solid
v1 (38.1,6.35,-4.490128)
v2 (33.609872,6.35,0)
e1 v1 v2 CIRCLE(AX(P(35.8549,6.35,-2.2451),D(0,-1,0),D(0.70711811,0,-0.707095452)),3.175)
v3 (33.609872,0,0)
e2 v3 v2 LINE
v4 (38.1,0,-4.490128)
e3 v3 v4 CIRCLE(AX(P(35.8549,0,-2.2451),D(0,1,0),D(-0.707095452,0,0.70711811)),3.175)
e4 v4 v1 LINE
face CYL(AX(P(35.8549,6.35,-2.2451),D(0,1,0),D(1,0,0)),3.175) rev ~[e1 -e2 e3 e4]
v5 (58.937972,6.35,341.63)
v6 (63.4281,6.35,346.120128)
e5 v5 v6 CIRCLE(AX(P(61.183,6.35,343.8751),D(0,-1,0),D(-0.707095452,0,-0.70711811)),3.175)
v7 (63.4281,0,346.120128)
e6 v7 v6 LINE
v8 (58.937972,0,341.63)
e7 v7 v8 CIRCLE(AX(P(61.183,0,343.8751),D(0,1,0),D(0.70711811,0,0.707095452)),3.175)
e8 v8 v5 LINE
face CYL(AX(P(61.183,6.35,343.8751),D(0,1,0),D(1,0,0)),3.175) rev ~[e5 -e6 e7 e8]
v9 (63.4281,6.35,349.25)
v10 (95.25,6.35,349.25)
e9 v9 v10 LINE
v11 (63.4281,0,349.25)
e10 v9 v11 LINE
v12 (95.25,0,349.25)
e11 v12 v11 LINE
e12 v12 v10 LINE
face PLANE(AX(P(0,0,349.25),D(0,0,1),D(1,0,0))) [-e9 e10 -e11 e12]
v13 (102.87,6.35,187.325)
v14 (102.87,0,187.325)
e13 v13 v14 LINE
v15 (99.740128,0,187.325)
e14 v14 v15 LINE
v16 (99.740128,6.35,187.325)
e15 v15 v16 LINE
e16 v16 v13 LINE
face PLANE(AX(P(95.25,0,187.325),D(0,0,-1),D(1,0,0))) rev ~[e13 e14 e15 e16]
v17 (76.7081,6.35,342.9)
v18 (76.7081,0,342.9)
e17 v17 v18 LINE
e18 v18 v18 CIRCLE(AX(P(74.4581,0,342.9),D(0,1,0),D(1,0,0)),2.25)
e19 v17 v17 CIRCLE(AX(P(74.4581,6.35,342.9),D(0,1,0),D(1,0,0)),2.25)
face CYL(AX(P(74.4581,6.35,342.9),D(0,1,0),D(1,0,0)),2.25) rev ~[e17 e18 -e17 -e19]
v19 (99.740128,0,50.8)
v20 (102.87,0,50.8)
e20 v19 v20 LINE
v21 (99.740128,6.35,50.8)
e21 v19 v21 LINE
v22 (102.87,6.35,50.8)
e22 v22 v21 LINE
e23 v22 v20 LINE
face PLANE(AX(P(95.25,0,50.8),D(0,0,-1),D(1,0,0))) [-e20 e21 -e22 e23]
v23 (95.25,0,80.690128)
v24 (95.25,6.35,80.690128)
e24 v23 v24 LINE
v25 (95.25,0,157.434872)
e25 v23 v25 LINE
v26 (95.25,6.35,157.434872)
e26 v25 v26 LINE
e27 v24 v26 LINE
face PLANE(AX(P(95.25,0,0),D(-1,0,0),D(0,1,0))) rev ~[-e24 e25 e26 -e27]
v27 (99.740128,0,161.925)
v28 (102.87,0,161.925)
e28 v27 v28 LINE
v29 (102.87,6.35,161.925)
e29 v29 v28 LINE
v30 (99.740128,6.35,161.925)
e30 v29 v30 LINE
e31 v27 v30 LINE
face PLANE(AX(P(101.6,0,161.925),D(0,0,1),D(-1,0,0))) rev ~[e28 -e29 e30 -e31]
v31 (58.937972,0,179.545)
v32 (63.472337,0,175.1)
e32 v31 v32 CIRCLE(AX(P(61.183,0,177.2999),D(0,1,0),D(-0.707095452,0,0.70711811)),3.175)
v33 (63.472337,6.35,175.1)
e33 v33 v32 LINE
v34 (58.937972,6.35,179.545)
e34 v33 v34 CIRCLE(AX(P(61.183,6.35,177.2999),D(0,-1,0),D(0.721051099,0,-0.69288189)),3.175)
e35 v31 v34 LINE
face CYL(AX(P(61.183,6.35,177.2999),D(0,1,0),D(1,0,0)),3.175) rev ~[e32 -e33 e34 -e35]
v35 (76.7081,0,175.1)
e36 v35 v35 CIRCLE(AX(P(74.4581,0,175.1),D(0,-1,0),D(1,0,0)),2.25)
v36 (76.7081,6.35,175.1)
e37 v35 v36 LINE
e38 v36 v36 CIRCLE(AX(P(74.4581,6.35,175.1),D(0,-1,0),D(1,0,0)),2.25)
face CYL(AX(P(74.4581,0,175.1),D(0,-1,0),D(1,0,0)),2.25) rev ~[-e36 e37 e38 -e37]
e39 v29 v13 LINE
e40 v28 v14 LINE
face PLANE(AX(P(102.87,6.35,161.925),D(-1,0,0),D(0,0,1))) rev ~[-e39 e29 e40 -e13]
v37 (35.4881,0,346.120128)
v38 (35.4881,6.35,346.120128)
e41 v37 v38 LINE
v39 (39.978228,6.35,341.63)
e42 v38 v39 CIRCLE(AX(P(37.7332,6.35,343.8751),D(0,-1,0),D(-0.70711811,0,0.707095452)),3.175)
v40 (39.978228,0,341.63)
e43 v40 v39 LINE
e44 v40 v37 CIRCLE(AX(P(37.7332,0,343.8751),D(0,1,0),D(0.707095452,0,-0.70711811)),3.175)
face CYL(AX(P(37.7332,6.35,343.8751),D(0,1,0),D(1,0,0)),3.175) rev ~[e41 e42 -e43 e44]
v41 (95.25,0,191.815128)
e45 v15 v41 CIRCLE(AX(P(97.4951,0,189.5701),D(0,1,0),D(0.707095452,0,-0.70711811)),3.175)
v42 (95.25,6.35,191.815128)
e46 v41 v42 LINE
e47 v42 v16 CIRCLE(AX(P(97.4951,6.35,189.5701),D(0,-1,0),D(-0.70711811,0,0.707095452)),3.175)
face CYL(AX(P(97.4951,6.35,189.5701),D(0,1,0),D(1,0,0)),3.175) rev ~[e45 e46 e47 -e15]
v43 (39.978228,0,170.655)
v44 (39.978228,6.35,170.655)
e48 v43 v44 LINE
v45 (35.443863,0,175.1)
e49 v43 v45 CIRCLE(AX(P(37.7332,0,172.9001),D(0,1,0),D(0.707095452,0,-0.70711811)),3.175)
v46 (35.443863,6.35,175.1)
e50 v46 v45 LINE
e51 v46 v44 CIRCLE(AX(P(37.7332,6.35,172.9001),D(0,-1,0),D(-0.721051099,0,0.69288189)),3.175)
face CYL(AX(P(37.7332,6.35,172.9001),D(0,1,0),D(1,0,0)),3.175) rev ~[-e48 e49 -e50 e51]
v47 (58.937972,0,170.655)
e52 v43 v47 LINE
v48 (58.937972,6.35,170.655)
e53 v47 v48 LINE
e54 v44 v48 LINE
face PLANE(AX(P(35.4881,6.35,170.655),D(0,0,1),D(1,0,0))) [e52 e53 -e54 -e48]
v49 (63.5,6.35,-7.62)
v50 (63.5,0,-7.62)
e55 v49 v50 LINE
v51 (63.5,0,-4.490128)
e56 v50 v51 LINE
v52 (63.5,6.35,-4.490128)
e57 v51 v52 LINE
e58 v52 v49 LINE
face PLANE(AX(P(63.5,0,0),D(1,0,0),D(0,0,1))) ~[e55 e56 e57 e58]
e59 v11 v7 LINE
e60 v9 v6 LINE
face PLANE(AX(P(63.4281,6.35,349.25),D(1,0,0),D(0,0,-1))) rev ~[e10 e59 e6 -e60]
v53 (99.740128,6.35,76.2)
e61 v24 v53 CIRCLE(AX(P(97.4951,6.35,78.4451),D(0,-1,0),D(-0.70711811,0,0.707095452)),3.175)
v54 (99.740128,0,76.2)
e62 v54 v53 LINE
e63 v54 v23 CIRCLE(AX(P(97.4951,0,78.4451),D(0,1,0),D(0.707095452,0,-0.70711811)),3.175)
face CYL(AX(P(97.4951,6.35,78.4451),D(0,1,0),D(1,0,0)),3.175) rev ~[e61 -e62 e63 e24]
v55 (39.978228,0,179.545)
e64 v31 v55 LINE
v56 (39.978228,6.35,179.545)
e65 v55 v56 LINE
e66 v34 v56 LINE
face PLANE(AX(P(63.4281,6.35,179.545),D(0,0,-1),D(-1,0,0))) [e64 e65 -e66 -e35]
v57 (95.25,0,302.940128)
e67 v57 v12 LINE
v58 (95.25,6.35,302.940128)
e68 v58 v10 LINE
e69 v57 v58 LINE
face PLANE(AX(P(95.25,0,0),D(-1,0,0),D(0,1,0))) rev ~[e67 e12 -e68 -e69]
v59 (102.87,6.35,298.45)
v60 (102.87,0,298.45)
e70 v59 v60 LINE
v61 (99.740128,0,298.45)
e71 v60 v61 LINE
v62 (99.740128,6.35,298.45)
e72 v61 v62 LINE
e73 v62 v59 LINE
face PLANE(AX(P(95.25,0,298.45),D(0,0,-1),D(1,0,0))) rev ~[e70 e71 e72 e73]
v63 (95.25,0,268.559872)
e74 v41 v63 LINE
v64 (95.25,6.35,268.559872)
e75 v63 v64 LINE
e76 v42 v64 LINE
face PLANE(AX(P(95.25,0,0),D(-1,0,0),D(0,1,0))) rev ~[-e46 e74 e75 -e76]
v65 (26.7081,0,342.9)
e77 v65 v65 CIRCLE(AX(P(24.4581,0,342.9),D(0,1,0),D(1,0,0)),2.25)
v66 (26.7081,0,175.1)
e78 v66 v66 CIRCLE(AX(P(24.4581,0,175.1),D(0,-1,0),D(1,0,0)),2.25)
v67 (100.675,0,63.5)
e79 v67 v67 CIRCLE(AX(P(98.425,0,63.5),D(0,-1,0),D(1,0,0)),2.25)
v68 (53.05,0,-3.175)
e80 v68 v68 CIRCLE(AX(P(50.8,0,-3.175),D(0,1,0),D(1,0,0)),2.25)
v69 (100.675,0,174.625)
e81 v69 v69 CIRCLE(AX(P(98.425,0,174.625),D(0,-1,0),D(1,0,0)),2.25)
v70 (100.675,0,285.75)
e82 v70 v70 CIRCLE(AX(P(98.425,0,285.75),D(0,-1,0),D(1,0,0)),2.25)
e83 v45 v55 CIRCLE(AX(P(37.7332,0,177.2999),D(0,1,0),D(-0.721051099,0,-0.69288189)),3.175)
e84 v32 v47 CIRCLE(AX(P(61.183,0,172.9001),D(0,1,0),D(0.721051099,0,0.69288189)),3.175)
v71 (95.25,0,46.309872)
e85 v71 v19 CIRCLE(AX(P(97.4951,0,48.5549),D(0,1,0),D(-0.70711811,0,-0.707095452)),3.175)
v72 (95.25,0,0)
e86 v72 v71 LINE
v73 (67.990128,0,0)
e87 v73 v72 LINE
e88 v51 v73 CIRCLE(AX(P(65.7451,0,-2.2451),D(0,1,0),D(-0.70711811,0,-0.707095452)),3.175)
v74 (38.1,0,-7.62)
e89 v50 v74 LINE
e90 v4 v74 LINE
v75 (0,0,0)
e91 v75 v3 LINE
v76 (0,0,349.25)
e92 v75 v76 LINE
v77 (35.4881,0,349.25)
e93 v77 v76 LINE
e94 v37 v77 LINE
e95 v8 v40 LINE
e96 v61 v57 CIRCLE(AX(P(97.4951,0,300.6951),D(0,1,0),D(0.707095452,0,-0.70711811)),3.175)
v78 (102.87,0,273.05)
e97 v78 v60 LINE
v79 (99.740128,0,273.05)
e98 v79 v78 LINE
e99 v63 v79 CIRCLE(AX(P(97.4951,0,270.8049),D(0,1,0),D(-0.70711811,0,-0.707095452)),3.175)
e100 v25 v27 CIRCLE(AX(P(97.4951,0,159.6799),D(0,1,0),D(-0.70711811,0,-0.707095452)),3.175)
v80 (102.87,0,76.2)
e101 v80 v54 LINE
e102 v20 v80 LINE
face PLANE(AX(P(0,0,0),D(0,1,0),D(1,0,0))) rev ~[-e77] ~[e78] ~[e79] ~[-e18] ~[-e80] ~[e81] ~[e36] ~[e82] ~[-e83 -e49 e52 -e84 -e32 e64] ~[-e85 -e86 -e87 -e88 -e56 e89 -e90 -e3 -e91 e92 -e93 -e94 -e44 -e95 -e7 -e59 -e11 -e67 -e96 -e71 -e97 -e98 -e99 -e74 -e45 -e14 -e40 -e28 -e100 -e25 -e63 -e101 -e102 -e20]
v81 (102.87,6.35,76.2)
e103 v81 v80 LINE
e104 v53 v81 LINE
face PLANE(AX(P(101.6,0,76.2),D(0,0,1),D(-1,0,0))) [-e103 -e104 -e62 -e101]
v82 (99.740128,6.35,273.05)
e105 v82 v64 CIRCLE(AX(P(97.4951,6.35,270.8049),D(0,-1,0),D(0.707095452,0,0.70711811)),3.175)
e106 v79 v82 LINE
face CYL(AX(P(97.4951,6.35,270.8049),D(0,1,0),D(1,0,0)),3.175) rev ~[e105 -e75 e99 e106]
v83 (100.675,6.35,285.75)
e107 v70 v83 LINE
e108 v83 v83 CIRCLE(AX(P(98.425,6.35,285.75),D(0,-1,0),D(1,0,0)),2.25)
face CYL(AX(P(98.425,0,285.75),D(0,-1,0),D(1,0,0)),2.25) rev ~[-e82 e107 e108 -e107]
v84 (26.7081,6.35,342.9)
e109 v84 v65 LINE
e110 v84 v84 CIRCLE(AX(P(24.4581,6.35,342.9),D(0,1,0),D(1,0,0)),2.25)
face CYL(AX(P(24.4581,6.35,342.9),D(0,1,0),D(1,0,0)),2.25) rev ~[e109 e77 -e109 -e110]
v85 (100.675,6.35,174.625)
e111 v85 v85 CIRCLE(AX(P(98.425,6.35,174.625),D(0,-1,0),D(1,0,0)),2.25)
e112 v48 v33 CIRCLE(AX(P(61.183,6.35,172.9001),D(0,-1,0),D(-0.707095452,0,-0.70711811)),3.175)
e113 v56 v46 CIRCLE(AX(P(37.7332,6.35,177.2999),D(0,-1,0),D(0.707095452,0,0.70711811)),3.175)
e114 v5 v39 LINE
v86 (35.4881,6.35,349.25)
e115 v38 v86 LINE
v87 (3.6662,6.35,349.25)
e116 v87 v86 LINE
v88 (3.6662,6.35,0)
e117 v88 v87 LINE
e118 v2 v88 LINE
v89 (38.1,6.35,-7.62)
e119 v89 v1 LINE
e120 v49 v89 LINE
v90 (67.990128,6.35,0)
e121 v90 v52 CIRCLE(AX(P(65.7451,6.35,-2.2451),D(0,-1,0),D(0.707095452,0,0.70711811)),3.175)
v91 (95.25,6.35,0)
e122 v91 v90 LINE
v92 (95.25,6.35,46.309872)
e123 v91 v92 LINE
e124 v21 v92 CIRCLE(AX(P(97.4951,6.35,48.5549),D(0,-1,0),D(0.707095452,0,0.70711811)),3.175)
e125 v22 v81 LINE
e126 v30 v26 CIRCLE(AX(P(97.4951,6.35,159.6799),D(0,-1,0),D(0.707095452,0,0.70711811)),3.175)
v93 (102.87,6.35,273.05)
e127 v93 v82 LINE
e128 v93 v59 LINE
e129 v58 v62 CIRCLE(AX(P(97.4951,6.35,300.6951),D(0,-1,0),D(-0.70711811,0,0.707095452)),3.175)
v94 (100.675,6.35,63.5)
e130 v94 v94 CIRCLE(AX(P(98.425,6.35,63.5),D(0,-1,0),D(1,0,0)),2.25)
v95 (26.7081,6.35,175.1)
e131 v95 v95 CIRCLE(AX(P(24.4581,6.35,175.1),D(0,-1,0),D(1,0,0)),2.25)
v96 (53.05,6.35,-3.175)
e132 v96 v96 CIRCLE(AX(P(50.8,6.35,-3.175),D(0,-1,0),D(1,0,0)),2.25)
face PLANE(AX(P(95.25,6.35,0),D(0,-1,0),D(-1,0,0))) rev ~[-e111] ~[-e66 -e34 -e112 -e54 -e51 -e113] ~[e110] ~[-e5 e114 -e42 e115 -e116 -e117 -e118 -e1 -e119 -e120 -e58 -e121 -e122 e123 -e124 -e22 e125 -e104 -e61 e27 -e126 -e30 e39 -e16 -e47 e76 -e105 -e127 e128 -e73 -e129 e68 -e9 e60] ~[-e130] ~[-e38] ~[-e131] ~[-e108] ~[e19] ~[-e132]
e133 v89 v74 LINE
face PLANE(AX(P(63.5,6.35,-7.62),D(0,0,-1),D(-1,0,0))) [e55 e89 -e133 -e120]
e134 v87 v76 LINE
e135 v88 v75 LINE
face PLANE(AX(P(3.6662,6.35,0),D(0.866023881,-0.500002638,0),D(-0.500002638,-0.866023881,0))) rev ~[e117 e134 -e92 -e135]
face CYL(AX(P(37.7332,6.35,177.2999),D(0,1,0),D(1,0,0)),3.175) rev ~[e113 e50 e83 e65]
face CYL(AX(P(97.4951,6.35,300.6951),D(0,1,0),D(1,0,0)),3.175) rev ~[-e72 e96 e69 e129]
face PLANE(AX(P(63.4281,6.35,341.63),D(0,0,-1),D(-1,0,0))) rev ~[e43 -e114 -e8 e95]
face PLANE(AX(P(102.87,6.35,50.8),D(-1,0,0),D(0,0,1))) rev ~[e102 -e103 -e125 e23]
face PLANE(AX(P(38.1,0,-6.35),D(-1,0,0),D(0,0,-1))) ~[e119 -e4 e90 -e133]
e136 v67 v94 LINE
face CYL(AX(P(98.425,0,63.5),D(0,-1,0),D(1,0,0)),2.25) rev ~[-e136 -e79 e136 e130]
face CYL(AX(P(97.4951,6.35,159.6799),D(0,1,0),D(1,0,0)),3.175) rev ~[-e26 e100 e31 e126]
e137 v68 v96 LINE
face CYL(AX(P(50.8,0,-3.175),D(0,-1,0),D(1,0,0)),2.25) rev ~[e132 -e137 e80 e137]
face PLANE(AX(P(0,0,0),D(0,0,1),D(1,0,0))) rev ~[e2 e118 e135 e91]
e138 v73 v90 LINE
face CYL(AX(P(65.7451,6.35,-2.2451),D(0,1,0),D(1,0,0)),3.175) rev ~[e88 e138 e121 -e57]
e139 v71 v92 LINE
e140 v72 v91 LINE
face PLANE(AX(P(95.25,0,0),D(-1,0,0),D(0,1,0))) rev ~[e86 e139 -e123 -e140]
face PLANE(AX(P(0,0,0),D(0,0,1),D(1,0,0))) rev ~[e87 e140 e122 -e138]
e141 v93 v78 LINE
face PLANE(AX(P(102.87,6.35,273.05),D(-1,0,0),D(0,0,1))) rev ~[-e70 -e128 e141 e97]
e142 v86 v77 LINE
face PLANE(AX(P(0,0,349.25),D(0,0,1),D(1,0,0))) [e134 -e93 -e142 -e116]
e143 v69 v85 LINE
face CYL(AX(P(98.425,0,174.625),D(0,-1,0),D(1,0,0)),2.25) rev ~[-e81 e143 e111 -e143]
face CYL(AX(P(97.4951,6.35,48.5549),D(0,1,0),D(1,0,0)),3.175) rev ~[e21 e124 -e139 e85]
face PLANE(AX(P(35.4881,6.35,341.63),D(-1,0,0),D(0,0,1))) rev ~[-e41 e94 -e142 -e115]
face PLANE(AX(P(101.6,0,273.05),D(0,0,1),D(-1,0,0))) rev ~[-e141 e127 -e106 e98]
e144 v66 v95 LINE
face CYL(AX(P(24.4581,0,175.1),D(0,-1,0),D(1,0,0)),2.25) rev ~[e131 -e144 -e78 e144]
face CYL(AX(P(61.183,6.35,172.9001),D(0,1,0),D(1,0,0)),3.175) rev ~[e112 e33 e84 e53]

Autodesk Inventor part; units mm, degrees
ref_plane "YZ Plane" through (0, 0, 0) normal (1, 0, 0) x (0, 1, 0)
ref_plane "XZ Plane" through (0, 0, 0) normal (0, 1, 0) x (-1, 0, 0)
sketch "Sketch1" plane through (0, 0, 0) normal (0, 0, 1) x (1, 0, 0)
  line L0 (0, 0) -> (95.25, 0)
  line L1 (95.25, 0) -> (95.25, 6.35)
  line L2 (95.25, 6.35) -> (3.6662, 6.35)
  line L3 (3.6662, 6.35) -> (0, 0)
  dimension "d0" = 95.25
  dimension "d1" = 6.35
  dimension "d2" = 60
extrude "Extrusion1" add sketch "Sketch1" along normal blind 349.25
sketch "Sketch2" plane through (0, 0, 0) normal (0, -1, 0) x (1, 0, 0)
  line L0 (38.1, 349.25) -> (63.5, 349.25)
  line L1 (63.5, 349.25) -> (63.5, 355.6)
  line L2 (63.5, 355.6) -> (38.1, 355.6)
  line L3 (38.1, 355.6) -> (38.1, 349.25)
  line L4 (0, 349.25) -> (101.6, 349.25)
  line L5 (0, 349.25) -> (95.25, 349.25) projected
  point P0 (0, 0)
  point P1 (50.8, 349.25)
  dimension "d5" = 25.4
  dimension "d6" = 6.35
  dimension "d9" = 101.6
extrude "Extrusion2" add sketch "Sketch2" against normal blind 6.35
sketch "Sketch3" plane through (0, 0, 0) normal (0, -1, 0) x (1, 0, 0)
  line L0 (63.5, 349.25) -> (63.5, 355.6) projected
  line L1 (63.5, 355.6) -> (38.1, 355.6) projected
  circle A0 centre (50.8, 352.425) radius 2.25
  point P0 (0, 0)
  point P1 (50.8, 355.6)
  point P2 (63.5, 352.425)
  dimension "d10" = 4.5
extrude "Extrusion3" cut sketch "Sketch3" against normal through all
sketch "Sketch4" plane through (0, 0, 0) normal (0, -1, 0) x (1, 0, 0)
  line L0 (95.25, 0) -> (95.25, 349.25) projected
  line L1 (95.25, 50.8) -> (101.6, 50.8)
  line L2 (101.6, 50.8) -> (101.6, 76.2)
  line L3 (101.6, 76.2) -> (95.25, 76.2)
  line L4 (95.25, 76.2) -> (95.25, 50.8)
  line L5 (95.25, 298.45) -> (101.6, 298.45)
  line L6 (101.6, 298.45) -> (101.6, 273.05)
  line L7 (101.6, 273.05) -> (95.25, 273.05)
  line L8 (95.25, 273.05) -> (95.25, 298.45)
  line L9 (95.25, 187.325) -> (101.6, 187.325)
  line L10 (101.6, 187.325) -> (101.6, 161.925)
  line L11 (101.6, 161.925) -> (95.25, 161.925)
  line L12 (95.25, 161.925) -> (95.25, 187.325)
  circle A0 centre (98.425, 285.75) radius 2.25
  circle A1 centre (98.425, 174.625) radius 2.25
  circle A2 centre (98.425, 63.5) radius 2.25
  point P0 (0, 0)
  point P1 (95.25, 174.625)
  point P2 (98.425, 298.45)
  point P3 (98.425, 187.325)
  point P4 (98.425, 76.2)
  point P5 (101.6, 285.75)
  point P6 (101.6, 174.625)
  point P7 (101.6, 63.5)
  dimension "d13" = 6.35
  dimension "d14" = 25.4
  dimension "d15" = 6.35
  dimension "d16" = 25.4
  dimension "d17" = 6.35
  dimension "d18" = 25.4
  dimension "d19" = 50.8
  dimension "d20" = 50.8
  dimension "d21" = 4.5
  dimension "d22" = 4.5
  dimension "d23" = 4.5
extrude "Extrusion4" add sketch "Sketch4" against normal blind 6.35
sketch "Sketch9" plane through (95.25, 0, 298.45) normal (0, 0, 1) x (1, 0, 0)
  line L0 (-95.25, 0) -> (0, 0) projected
  line L1 (-95.25, 0) -> (-95.25, 6.35)
  line L2 (0, 6.35) -> (-91.5838, 6.35) projected
  line L3 (-95.25, 6.35) -> (-91.5838, 6.35)
  line L4 (-91.5838, 6.35) -> (-95.25, 0)
  line L5 (-91.5838, 6.35) -> (-95.25, 0) projected
extrude "Extrusion9" [suppressed]
sketch "Sketch10" plane through (95.25, 0, 187.325) normal (0, 0, 1) x (1, 0, 0)
  line L0 (-81.5677, 12.7) -> (-88.9, 0) projected
  line L1 (-81.5677, 12.7) -> (-88.9, 12.7) projected
  line L2 (-88.9, 12.7) -> (-88.9, 0) projected
  point P0 (-95.25, 0)
extrude "Extrusion10" [suppressed]
sketch "Sketch11" plane through (95.25, 0, 76.2) normal (0, 0, 1) x (1, 0, 0)
  line L0 (-81.5677, 12.7) -> (-88.9, 0) projected
  line L1 (-81.5677, 12.7) -> (-88.9, 12.7) projected
  line L2 (-88.9, 12.7) -> (-88.9, 0) projected
  point P0 (-95.25, 0)
extrude "Extrusion11" [suppressed]
ref_plane "Work Plane1" through (0, 0, 174.625) normal (0, 0, 1) x (1, 0, 0)
mirror "Mirror1" about plane through (0, 0, 174.625) normal (0, 0, 1) of "Extrusion1", "Extrusion2", "Extrusion3", "Extrusion4"
sketch "Sketch12" plane through (3.6662, 6.35, 349.25) normal (0, 1, 0) x (1, 0, 0)
  line L0 (59.8338, 0) -> (59.8338, -6.35) projected
  line L1 (59.8338, -6.35) -> (59.8338, 0) projected
  line L2 (59.8338, -6.35) -> (34.4338, -6.35) projected
  line L3 (34.4338, -6.35) -> (59.8338, -6.35) projected
  line L4 (34.4338, 0) -> (34.4338, -6.35) projected
  line L5 (59.8338, 0) -> (34.4338, 0)
  line L6 (91.5838, 0) -> (59.8338, 0) projected
  line L7 (34.4338, -6.35) -> (59.8338, -6.35)
  line L8 (59.8338, -6.35) -> (59.8338, 0)
  line L9 (59.8338, 0) -> (34.4338, 0)
  line L10 (34.4338, 0) -> (34.4338, -6.35)
  point P0 (-3.6662, 349.25)
extrude "Extrusion12" cut sketch "Sketch12" along normal through all both and the other way through all
sketch "Sketch13" plane through (3.6662, 6.35, 349.25) normal (0, 1, 0) x (1, 0, 0)
  circle A0 centre (20.7919, 6.35) radius 2.25
  line L0 (91.5838, 0) -> (0, 0) projected
  circle A1 centre (70.7919, 6.35) radius 2.25
  line L1 (33.0919, 0) -> (58.4919, 0)
  line L2 (58.4919, 0) -> (58.4919, 6.35)
  line L3 (58.4919, 6.35) -> (33.0919, 6.35)
  line L4 (33.0919, 6.35) -> (33.0919, 0)
  line L5 (20.7919, 6.35) -> (70.7919, 6.35) construction
  point P0 (-3.6662, 349.25)
  point P1 (45.7919, 6.35)
  point P2 (45.7919, 0)
  point P3 (45.7919, 0)
  dimension "d44" = 4.5
  dimension "d45" = 6.35
  dimension "d46" = 4.5
  dimension "d47" = 25.4
  dimension "d48" = 6.35
  dimension "d49" = 50
extrude "Extrusion13" cut sketch "Sketch13" against normal through all
sketch "Sketch14" plane through (95.25, 0, 50.8) normal (0, -1, 0) x (1, 0, 0)
  line L0 (6.35, 111.125) -> (6.35, 136.525) projected
  line L1 (-33.0919, 292.1) -> (-58.4919, 292.1) projected
  line L2 (-58.4919, 127.475) -> (-33.0919, 127.475)
  line L3 (-33.0919, 127.475) -> (-33.0919, 121.125)
  line L4 (-33.0919, 121.125) -> (-58.4919, 121.125)
  line L5 (-58.4919, 121.125) -> (-58.4919, 127.475)
  point P0 (-95.25, -50.8)
  dimension "d54" = 6.35
  dimension "d55" = 10
extrude "Extrusion14" cut sketch "Sketch14" against normal through all
sketch "Sketch15" plane through (95.25, 0, 50.8) normal (0, -1, 0) x (1, 0, 0)
  circle A0 centre (-70.7919, 124.3) radius 2.25
  circle A1 centre (-20.7919, 124.3) radius 2.25
  circle A2 centre (-70.7919, 292.1) radius 2.25 projected
  circle A3 centre (-20.7919, 292.1) radius 2.25 projected
  line L0 (-33.0919, 127.475) -> (-33.0919, 121.125) projected
  point P0 (-95.25, -50.8)
  point P1 (-33.0919, 124.3)
  point P2 (-33.0919, 124.3)
  dimension "d56" = 4.5
  dimension "d57" = 4.5
extrude "Extrusion15" cut sketch "Sketch15" against normal through all contours A0 | A1
sketch "Sketch16" plane through (95.25, 6.35, 298.45) normal (0, 1, 0) x (1, 0, 0)
  line L0 (-59.7619, 127.795) -> (-31.8219, 127.795)
  line L1 (-31.8219, 127.795) -> (-31.8219, 118.905)
  line L2 (-31.8219, 118.905) -> (-59.7619, 118.905)
  line L3 (-59.7619, 118.905) -> (-59.7619, 127.795)
  line L4 (-95.25, -50.8) -> (-58.4919, -50.8) projected
  line L5 (-59.7619, -50.8) -> (-31.8219, -50.8)
  line L6 (-31.8219, -50.8) -> (-31.8219, -43.18)
  line L7 (-31.8219, -43.18) -> (-59.7619, -43.18)
  line L8 (-59.7619, -43.18) -> (-59.7619, -50.8)
  line L9 (-33.0919, 120.175) -> (-58.4919, 120.175) projected
  line L10 (-58.4919, -44.45) -> (-33.0919, -44.45) projected
  line L11 (-58.4919, 120.175) -> (-58.4919, 126.525) projected
  circle A0 centre (-59.3951, 300.6951) radius 3.175
  circle A1 centre (-29.5049, 300.6951) radius 3.175
  circle A2 centre (2.2451, 249.8951) radius 3.175
  circle A3 centre (2.2451, 220.0049) radius 3.175
  circle A4 centre (2.2451, 138.7701) radius 3.175
  circle A5 centre (2.2451, 108.8799) radius 3.175
  circle A6 centre (2.2451, 27.6451) radius 3.175
  circle A7 centre (2.2451, -2.2451) radius 3.175
  line L12 (-59.3951, 300.6951) -> (-57.15, 298.45)
  line L13 (-57.15, 304.8) -> (-57.15, 298.45) projected
  line L14 (0, 247.65) -> (2.2451, 249.8951)
  line L15 (6.35, 247.65) -> (0, 247.65) projected
  point P0 (-95.25, 298.45)
  point P1 (-45.7919, 120.175)
  point P2 (-45.7919, 118.905)
  point P3 (-45.7919, -43.18)
  point P4 (-45.7919, -44.45)
  point P5 (-58.4919, 123.35)
  point P6 (-59.7619, 123.35)
  point P7 (0, 0)
  point P8 (0, 25.4)
  point P9 (0, 111.125)
  point P10 (0, 136.525)
  point P11 (0, 222.25)
  point P12 (-31.75, 298.45)
  dimension "d63" = 6.35
  dimension "d64" = 6.35
  dimension "d65" = 6.35
  dimension "d66" = 6.35
  dimension "d67" = 6.35
  dimension "d68" = 6.35
  dimension "d69" = 6.35
  dimension "d70" = 6.35
  dimension "d60" = 1.27
  dimension "d61" = 1.27
  dimension "d62" = 1.27
  dimension "d77" = 45
  dimension "d78" = 45
extrude "Extrusion16" cut sketch "Sketch16" against normal through all
sketch "Sketch17" plane through (101.6, 6.35, 298.45) normal (0, 1, 0) x (1, 0, 0)
  line L0 (-63.5, 304.8) -> (-38.1, 304.8)
  line L1 (-38.1, 304.8) -> (-38.1, 306.07)
  line L2 (-38.1, 306.07) -> (-63.5, 306.07)
  line L3 (-63.5, 306.07) -> (-63.5, 304.8)
  line L4 (0, 247.65) -> (1.27, 247.65)
  line L5 (1.27, 247.65) -> (1.27, 222.25)
  line L6 (1.27, 222.25) -> (0, 222.25)
  line L7 (0, 222.25) -> (0, 247.65)
  line L8 (0, 136.525) -> (1.27, 136.525)
  line L9 (1.27, 136.525) -> (1.27, 111.125)
  line L10 (1.27, 111.125) -> (0, 111.125)
  line L11 (0, 111.125) -> (0, 136.525)
  line L12 (0, 25.4) -> (1.27, 25.4)
  line L13 (1.27, 25.4) -> (1.27, 0)
  line L14 (1.27, 0) -> (0, 0)
  line L15 (0, 0) -> (0, 25.4)
  point P0 (-101.6, 298.45)
  dimension "d73" = 1.27
  dimension "d74" = 1.27
extrude "Extrusion17" add sketch "Sketch17" against normal up to surface (6.35 mm away) from surface at 0
sketch "Sketch18" plane through (3.6662, 6.35, 349.25) normal (0, 1, 0) x (1, 0, 0)
  line L0 (59.7619, 7.62) -> (59.7619, 0) construction
  line L1 (91.5838, 0) -> (59.7619, 0) construction
  line L2 (91.5838, 46.3099) -> (91.5838, 0) construction
  arc A0 (96.074, 50.8) -> (91.5838, 46.3099) centre (93.8289, 48.5549) ccw construction
  line L3 (96.074, 50.8) -> (99.2038, 50.8) construction
  line L4 (99.2038, 76.2) -> (99.2038, 50.8) construction
  line L5 (96.074, 76.2) -> (99.2038, 76.2) construction
  arc A1 (91.5838, 80.6901) -> (96.074, 76.2) centre (93.8289, 78.4451) ccw construction
  line L6 (91.5838, 157.4349) -> (91.5838, 80.6901) construction
  arc A2 (96.074, 161.925) -> (91.5838, 157.4349) centre (93.8289, 159.6799) ccw construction
  line L7 (96.074, 161.925) -> (99.2038, 161.925) construction
  line L8 (99.2038, 187.325) -> (99.2038, 161.925) construction
  line L9 (96.074, 187.325) -> (99.2038, 187.325) construction
  arc A3 (91.5838, 191.8151) -> (96.074, 187.325) centre (93.8289, 189.5701) ccw construction
  line L10 (91.5838, 268.5599) -> (91.5838, 191.8151) construction
  arc A4 (96.074, 273.05) -> (91.5838, 268.5599) centre (93.8289, 270.8049) ccw construction
  line L11 (96.074, 273.05) -> (99.2038, 273.05) construction
  line L12 (99.2038, 298.45) -> (99.2038, 273.05) construction
  line L13 (96.074, 298.45) -> (99.2038, 298.45) construction
  arc A5 (91.5838, 302.9401) -> (96.074, 298.45) centre (93.8289, 300.6951) ccw construction
  line L14 (91.5838, 349.25) -> (91.5838, 302.9401) construction
  line L15 (91.5838, 349.25) -> (64.324, 349.25) construction
  arc A6 (59.8338, 353.7401) -> (64.324, 349.25) centre (62.0789, 351.4951) ccw construction
  line L16 (59.8338, 356.87) -> (59.8338, 353.7401) construction
  line L17 (34.4338, 356.87) -> (59.8338, 356.87) construction
  line L18 (34.4338, 353.7401) -> (34.4338, 356.87) construction
  arc A7 (29.9437, 349.25) -> (34.4338, 353.7401) centre (32.1888, 351.4951) ccw construction
  line L19 (29.9437, 349.25) -> (0, 349.25) construction
  line L20 (0, 349.25) -> (0, 0) construction
  line L21 (31.8219, 0) -> (0, 0) construction
  line L22 (31.8219, 0) -> (31.8219, 7.62) construction
  line L23 (31.8219, 7.62) -> (59.7619, 7.62) construction
  line L24 (31.8219, 169.705) -> (31.8219, 178.595) construction
  line L25 (31.8219, 178.595) -> (59.7619, 178.595) construction
  line L26 (59.7619, 178.595) -> (59.7619, 169.705) construction
  line L27 (59.7619, 169.705) -> (31.8219, 169.705) construction
  circle A8 centre (20.7919, 174.15) radius 2.25 construction
  circle A9 centre (70.7919, 174.15) radius 2.25 construction
  circle A10 centre (94.7588, 285.75) radius 2.25 construction
  circle A11 centre (94.7588, 63.5) radius 2.25 construction
  circle A12 centre (94.7588, 174.625) radius 2.25 construction
  circle A13 centre (47.1338, 352.425) radius 2.25 construction
  circle A14 centre (20.7919, 6.35) radius 2.25 construction
  circle A15 centre (70.7919, 6.35) radius 2.25 construction
  line L28 (62.0789, 351.4951) -> (93.8289, 351.4951) construction
  line L29 (93.8289, 351.4951) -> (93.8289, 300.6951) construction
  line L30 (93.8289, 300.6951) -> (101.4489, 300.6951) construction
  line L31 (101.4489, 300.6951) -> (101.4489, 270.8049) construction
  line L32 (101.4489, 270.8049) -> (93.8289, 270.8049) construction
  line L33 (93.8289, 270.8049) -> (93.8289, 189.5701) construction
  line L34 (93.8289, 189.5701) -> (101.4489, 189.5701) construction
  line L35 (101.4489, 189.5701) -> (101.4489, 159.6799) construction
  line L36 (101.4489, 159.6799) -> (93.8289, 159.6799) construction
  line L37 (93.8289, 159.6799) -> (93.8289, 78.4451) construction
  line L38 (93.8289, 78.4451) -> (101.4489, 78.4451) construction
  line L39 (101.4489, 78.4451) -> (101.4489, 48.5549) construction
  line L40 (101.4489, 48.5549) -> (93.8289, 48.5549) construction
  line L41 (93.8289, 48.5549) -> (93.8289, -2.2451) construction
  line L42 (93.8289, -2.2451) -> (57.5168, -2.2451) construction
  line L43 (57.5168, -2.2451) -> (57.5168, 5.3749) construction
  line L44 (57.5168, 5.3749) -> (34.067, 5.3749) construction
  line L45 (34.067, 5.3749) -> (34.067, -2.2451) construction
  line L46 (34.067, -2.2451) -> (-2.2451, -2.2451) construction
  line L47 (-2.2451, -2.2451) -> (-2.2451, 351.4951) construction
  line L48 (-2.2451, 351.4951) -> (32.1888, 351.4951) construction
  line L49 (32.1888, 351.4951) -> (32.1888, 359.1151) construction
  line L50 (32.1888, 359.1151) -> (62.0789, 359.1151) construction
  line L51 (62.0789, 359.1151) -> (62.0789, 351.4951) construction
  line L52 (31.8219, 0) -> (31.8219, 7.62) projected
  circle A16 centre (34.067, 5.3749) radius 3.175
  line L53 (31.8219, 7.62) -> (59.7619, 7.62) projected
  circle A17 centre (57.5168, 5.3749) radius 3.175
  line L54 (57.5168, 176.3499) -> (34.067, 176.3499) construction
  line L55 (34.067, 176.3499) -> (34.067, 171.9501) construction
  line L56 (34.067, 171.9501) -> (57.5168, 171.9501) construction
  line L57 (57.5168, 171.9501) -> (57.5168, 176.3499) construction
  circle A18 centre (57.5168, 176.3499) radius 3.175
  line L58 (59.7619, 178.595) -> (59.7619, 169.705) projected
  circle A19 centre (57.5168, 171.9501) radius 3.175
  line L59 (31.8219, 169.705) -> (31.8219, 178.595) projected
  circle A20 centre (34.067, 171.9501) radius 3.175
  circle A21 centre (34.067, 176.3499) radius 3.175
  point P0 (-3.6662, 349.25)
  dimension "d79" = 6.35
  dimension "d80" = 6.35
extrude "Extrusion18" cut sketch "Sketch18" against normal through all
equation "\"d1\" = Panel_Thickness"
equation "\"d6\" = Panel_Thickness"
equation "\"d7\" = Panel_Thickness"
equation "\"d13\" = Panel_Thickness"
equation "\"d15\" = Panel_Thickness"
equation "\"d17\" = Panel_Thickness"
equation "\"d24\" = Panel_Thickness"
equation "\"d48\" = Panel_Thickness"
equation "\"d54\" = Panel_Thickness"
equation "\"d63\" = Tool_Dia"
equation "\"d64\" = d63"
equation "\"d65\" = d63"
equation "\"d66\" = d63"
equation "\"d67\" = d63"
equation "\"d68\" = d63"
equation "\"d69\" = d63"
equation "\"d70\" = d63"
equation "\"d60\" = Fit_Tolerance"
equation "\"d61\" = Fit_Tolerance"
equation "\"d62\" = Fit_Tolerance"
equation "\"d73\" = Fit_Tolerance"
equation "\"d74\" = d73"
equation "\"d79\" = Tool_Dia"
equation "\"d80\" = Tool_Dia"
equation "\"Panel_Thickness\" = 6.35"
equation "\"Fit_Tolerance\" = 1.27"
equation "\"Tool_Dia\" = 6.35"
properties part number "BA03" material "Polyethylene, High Density"
